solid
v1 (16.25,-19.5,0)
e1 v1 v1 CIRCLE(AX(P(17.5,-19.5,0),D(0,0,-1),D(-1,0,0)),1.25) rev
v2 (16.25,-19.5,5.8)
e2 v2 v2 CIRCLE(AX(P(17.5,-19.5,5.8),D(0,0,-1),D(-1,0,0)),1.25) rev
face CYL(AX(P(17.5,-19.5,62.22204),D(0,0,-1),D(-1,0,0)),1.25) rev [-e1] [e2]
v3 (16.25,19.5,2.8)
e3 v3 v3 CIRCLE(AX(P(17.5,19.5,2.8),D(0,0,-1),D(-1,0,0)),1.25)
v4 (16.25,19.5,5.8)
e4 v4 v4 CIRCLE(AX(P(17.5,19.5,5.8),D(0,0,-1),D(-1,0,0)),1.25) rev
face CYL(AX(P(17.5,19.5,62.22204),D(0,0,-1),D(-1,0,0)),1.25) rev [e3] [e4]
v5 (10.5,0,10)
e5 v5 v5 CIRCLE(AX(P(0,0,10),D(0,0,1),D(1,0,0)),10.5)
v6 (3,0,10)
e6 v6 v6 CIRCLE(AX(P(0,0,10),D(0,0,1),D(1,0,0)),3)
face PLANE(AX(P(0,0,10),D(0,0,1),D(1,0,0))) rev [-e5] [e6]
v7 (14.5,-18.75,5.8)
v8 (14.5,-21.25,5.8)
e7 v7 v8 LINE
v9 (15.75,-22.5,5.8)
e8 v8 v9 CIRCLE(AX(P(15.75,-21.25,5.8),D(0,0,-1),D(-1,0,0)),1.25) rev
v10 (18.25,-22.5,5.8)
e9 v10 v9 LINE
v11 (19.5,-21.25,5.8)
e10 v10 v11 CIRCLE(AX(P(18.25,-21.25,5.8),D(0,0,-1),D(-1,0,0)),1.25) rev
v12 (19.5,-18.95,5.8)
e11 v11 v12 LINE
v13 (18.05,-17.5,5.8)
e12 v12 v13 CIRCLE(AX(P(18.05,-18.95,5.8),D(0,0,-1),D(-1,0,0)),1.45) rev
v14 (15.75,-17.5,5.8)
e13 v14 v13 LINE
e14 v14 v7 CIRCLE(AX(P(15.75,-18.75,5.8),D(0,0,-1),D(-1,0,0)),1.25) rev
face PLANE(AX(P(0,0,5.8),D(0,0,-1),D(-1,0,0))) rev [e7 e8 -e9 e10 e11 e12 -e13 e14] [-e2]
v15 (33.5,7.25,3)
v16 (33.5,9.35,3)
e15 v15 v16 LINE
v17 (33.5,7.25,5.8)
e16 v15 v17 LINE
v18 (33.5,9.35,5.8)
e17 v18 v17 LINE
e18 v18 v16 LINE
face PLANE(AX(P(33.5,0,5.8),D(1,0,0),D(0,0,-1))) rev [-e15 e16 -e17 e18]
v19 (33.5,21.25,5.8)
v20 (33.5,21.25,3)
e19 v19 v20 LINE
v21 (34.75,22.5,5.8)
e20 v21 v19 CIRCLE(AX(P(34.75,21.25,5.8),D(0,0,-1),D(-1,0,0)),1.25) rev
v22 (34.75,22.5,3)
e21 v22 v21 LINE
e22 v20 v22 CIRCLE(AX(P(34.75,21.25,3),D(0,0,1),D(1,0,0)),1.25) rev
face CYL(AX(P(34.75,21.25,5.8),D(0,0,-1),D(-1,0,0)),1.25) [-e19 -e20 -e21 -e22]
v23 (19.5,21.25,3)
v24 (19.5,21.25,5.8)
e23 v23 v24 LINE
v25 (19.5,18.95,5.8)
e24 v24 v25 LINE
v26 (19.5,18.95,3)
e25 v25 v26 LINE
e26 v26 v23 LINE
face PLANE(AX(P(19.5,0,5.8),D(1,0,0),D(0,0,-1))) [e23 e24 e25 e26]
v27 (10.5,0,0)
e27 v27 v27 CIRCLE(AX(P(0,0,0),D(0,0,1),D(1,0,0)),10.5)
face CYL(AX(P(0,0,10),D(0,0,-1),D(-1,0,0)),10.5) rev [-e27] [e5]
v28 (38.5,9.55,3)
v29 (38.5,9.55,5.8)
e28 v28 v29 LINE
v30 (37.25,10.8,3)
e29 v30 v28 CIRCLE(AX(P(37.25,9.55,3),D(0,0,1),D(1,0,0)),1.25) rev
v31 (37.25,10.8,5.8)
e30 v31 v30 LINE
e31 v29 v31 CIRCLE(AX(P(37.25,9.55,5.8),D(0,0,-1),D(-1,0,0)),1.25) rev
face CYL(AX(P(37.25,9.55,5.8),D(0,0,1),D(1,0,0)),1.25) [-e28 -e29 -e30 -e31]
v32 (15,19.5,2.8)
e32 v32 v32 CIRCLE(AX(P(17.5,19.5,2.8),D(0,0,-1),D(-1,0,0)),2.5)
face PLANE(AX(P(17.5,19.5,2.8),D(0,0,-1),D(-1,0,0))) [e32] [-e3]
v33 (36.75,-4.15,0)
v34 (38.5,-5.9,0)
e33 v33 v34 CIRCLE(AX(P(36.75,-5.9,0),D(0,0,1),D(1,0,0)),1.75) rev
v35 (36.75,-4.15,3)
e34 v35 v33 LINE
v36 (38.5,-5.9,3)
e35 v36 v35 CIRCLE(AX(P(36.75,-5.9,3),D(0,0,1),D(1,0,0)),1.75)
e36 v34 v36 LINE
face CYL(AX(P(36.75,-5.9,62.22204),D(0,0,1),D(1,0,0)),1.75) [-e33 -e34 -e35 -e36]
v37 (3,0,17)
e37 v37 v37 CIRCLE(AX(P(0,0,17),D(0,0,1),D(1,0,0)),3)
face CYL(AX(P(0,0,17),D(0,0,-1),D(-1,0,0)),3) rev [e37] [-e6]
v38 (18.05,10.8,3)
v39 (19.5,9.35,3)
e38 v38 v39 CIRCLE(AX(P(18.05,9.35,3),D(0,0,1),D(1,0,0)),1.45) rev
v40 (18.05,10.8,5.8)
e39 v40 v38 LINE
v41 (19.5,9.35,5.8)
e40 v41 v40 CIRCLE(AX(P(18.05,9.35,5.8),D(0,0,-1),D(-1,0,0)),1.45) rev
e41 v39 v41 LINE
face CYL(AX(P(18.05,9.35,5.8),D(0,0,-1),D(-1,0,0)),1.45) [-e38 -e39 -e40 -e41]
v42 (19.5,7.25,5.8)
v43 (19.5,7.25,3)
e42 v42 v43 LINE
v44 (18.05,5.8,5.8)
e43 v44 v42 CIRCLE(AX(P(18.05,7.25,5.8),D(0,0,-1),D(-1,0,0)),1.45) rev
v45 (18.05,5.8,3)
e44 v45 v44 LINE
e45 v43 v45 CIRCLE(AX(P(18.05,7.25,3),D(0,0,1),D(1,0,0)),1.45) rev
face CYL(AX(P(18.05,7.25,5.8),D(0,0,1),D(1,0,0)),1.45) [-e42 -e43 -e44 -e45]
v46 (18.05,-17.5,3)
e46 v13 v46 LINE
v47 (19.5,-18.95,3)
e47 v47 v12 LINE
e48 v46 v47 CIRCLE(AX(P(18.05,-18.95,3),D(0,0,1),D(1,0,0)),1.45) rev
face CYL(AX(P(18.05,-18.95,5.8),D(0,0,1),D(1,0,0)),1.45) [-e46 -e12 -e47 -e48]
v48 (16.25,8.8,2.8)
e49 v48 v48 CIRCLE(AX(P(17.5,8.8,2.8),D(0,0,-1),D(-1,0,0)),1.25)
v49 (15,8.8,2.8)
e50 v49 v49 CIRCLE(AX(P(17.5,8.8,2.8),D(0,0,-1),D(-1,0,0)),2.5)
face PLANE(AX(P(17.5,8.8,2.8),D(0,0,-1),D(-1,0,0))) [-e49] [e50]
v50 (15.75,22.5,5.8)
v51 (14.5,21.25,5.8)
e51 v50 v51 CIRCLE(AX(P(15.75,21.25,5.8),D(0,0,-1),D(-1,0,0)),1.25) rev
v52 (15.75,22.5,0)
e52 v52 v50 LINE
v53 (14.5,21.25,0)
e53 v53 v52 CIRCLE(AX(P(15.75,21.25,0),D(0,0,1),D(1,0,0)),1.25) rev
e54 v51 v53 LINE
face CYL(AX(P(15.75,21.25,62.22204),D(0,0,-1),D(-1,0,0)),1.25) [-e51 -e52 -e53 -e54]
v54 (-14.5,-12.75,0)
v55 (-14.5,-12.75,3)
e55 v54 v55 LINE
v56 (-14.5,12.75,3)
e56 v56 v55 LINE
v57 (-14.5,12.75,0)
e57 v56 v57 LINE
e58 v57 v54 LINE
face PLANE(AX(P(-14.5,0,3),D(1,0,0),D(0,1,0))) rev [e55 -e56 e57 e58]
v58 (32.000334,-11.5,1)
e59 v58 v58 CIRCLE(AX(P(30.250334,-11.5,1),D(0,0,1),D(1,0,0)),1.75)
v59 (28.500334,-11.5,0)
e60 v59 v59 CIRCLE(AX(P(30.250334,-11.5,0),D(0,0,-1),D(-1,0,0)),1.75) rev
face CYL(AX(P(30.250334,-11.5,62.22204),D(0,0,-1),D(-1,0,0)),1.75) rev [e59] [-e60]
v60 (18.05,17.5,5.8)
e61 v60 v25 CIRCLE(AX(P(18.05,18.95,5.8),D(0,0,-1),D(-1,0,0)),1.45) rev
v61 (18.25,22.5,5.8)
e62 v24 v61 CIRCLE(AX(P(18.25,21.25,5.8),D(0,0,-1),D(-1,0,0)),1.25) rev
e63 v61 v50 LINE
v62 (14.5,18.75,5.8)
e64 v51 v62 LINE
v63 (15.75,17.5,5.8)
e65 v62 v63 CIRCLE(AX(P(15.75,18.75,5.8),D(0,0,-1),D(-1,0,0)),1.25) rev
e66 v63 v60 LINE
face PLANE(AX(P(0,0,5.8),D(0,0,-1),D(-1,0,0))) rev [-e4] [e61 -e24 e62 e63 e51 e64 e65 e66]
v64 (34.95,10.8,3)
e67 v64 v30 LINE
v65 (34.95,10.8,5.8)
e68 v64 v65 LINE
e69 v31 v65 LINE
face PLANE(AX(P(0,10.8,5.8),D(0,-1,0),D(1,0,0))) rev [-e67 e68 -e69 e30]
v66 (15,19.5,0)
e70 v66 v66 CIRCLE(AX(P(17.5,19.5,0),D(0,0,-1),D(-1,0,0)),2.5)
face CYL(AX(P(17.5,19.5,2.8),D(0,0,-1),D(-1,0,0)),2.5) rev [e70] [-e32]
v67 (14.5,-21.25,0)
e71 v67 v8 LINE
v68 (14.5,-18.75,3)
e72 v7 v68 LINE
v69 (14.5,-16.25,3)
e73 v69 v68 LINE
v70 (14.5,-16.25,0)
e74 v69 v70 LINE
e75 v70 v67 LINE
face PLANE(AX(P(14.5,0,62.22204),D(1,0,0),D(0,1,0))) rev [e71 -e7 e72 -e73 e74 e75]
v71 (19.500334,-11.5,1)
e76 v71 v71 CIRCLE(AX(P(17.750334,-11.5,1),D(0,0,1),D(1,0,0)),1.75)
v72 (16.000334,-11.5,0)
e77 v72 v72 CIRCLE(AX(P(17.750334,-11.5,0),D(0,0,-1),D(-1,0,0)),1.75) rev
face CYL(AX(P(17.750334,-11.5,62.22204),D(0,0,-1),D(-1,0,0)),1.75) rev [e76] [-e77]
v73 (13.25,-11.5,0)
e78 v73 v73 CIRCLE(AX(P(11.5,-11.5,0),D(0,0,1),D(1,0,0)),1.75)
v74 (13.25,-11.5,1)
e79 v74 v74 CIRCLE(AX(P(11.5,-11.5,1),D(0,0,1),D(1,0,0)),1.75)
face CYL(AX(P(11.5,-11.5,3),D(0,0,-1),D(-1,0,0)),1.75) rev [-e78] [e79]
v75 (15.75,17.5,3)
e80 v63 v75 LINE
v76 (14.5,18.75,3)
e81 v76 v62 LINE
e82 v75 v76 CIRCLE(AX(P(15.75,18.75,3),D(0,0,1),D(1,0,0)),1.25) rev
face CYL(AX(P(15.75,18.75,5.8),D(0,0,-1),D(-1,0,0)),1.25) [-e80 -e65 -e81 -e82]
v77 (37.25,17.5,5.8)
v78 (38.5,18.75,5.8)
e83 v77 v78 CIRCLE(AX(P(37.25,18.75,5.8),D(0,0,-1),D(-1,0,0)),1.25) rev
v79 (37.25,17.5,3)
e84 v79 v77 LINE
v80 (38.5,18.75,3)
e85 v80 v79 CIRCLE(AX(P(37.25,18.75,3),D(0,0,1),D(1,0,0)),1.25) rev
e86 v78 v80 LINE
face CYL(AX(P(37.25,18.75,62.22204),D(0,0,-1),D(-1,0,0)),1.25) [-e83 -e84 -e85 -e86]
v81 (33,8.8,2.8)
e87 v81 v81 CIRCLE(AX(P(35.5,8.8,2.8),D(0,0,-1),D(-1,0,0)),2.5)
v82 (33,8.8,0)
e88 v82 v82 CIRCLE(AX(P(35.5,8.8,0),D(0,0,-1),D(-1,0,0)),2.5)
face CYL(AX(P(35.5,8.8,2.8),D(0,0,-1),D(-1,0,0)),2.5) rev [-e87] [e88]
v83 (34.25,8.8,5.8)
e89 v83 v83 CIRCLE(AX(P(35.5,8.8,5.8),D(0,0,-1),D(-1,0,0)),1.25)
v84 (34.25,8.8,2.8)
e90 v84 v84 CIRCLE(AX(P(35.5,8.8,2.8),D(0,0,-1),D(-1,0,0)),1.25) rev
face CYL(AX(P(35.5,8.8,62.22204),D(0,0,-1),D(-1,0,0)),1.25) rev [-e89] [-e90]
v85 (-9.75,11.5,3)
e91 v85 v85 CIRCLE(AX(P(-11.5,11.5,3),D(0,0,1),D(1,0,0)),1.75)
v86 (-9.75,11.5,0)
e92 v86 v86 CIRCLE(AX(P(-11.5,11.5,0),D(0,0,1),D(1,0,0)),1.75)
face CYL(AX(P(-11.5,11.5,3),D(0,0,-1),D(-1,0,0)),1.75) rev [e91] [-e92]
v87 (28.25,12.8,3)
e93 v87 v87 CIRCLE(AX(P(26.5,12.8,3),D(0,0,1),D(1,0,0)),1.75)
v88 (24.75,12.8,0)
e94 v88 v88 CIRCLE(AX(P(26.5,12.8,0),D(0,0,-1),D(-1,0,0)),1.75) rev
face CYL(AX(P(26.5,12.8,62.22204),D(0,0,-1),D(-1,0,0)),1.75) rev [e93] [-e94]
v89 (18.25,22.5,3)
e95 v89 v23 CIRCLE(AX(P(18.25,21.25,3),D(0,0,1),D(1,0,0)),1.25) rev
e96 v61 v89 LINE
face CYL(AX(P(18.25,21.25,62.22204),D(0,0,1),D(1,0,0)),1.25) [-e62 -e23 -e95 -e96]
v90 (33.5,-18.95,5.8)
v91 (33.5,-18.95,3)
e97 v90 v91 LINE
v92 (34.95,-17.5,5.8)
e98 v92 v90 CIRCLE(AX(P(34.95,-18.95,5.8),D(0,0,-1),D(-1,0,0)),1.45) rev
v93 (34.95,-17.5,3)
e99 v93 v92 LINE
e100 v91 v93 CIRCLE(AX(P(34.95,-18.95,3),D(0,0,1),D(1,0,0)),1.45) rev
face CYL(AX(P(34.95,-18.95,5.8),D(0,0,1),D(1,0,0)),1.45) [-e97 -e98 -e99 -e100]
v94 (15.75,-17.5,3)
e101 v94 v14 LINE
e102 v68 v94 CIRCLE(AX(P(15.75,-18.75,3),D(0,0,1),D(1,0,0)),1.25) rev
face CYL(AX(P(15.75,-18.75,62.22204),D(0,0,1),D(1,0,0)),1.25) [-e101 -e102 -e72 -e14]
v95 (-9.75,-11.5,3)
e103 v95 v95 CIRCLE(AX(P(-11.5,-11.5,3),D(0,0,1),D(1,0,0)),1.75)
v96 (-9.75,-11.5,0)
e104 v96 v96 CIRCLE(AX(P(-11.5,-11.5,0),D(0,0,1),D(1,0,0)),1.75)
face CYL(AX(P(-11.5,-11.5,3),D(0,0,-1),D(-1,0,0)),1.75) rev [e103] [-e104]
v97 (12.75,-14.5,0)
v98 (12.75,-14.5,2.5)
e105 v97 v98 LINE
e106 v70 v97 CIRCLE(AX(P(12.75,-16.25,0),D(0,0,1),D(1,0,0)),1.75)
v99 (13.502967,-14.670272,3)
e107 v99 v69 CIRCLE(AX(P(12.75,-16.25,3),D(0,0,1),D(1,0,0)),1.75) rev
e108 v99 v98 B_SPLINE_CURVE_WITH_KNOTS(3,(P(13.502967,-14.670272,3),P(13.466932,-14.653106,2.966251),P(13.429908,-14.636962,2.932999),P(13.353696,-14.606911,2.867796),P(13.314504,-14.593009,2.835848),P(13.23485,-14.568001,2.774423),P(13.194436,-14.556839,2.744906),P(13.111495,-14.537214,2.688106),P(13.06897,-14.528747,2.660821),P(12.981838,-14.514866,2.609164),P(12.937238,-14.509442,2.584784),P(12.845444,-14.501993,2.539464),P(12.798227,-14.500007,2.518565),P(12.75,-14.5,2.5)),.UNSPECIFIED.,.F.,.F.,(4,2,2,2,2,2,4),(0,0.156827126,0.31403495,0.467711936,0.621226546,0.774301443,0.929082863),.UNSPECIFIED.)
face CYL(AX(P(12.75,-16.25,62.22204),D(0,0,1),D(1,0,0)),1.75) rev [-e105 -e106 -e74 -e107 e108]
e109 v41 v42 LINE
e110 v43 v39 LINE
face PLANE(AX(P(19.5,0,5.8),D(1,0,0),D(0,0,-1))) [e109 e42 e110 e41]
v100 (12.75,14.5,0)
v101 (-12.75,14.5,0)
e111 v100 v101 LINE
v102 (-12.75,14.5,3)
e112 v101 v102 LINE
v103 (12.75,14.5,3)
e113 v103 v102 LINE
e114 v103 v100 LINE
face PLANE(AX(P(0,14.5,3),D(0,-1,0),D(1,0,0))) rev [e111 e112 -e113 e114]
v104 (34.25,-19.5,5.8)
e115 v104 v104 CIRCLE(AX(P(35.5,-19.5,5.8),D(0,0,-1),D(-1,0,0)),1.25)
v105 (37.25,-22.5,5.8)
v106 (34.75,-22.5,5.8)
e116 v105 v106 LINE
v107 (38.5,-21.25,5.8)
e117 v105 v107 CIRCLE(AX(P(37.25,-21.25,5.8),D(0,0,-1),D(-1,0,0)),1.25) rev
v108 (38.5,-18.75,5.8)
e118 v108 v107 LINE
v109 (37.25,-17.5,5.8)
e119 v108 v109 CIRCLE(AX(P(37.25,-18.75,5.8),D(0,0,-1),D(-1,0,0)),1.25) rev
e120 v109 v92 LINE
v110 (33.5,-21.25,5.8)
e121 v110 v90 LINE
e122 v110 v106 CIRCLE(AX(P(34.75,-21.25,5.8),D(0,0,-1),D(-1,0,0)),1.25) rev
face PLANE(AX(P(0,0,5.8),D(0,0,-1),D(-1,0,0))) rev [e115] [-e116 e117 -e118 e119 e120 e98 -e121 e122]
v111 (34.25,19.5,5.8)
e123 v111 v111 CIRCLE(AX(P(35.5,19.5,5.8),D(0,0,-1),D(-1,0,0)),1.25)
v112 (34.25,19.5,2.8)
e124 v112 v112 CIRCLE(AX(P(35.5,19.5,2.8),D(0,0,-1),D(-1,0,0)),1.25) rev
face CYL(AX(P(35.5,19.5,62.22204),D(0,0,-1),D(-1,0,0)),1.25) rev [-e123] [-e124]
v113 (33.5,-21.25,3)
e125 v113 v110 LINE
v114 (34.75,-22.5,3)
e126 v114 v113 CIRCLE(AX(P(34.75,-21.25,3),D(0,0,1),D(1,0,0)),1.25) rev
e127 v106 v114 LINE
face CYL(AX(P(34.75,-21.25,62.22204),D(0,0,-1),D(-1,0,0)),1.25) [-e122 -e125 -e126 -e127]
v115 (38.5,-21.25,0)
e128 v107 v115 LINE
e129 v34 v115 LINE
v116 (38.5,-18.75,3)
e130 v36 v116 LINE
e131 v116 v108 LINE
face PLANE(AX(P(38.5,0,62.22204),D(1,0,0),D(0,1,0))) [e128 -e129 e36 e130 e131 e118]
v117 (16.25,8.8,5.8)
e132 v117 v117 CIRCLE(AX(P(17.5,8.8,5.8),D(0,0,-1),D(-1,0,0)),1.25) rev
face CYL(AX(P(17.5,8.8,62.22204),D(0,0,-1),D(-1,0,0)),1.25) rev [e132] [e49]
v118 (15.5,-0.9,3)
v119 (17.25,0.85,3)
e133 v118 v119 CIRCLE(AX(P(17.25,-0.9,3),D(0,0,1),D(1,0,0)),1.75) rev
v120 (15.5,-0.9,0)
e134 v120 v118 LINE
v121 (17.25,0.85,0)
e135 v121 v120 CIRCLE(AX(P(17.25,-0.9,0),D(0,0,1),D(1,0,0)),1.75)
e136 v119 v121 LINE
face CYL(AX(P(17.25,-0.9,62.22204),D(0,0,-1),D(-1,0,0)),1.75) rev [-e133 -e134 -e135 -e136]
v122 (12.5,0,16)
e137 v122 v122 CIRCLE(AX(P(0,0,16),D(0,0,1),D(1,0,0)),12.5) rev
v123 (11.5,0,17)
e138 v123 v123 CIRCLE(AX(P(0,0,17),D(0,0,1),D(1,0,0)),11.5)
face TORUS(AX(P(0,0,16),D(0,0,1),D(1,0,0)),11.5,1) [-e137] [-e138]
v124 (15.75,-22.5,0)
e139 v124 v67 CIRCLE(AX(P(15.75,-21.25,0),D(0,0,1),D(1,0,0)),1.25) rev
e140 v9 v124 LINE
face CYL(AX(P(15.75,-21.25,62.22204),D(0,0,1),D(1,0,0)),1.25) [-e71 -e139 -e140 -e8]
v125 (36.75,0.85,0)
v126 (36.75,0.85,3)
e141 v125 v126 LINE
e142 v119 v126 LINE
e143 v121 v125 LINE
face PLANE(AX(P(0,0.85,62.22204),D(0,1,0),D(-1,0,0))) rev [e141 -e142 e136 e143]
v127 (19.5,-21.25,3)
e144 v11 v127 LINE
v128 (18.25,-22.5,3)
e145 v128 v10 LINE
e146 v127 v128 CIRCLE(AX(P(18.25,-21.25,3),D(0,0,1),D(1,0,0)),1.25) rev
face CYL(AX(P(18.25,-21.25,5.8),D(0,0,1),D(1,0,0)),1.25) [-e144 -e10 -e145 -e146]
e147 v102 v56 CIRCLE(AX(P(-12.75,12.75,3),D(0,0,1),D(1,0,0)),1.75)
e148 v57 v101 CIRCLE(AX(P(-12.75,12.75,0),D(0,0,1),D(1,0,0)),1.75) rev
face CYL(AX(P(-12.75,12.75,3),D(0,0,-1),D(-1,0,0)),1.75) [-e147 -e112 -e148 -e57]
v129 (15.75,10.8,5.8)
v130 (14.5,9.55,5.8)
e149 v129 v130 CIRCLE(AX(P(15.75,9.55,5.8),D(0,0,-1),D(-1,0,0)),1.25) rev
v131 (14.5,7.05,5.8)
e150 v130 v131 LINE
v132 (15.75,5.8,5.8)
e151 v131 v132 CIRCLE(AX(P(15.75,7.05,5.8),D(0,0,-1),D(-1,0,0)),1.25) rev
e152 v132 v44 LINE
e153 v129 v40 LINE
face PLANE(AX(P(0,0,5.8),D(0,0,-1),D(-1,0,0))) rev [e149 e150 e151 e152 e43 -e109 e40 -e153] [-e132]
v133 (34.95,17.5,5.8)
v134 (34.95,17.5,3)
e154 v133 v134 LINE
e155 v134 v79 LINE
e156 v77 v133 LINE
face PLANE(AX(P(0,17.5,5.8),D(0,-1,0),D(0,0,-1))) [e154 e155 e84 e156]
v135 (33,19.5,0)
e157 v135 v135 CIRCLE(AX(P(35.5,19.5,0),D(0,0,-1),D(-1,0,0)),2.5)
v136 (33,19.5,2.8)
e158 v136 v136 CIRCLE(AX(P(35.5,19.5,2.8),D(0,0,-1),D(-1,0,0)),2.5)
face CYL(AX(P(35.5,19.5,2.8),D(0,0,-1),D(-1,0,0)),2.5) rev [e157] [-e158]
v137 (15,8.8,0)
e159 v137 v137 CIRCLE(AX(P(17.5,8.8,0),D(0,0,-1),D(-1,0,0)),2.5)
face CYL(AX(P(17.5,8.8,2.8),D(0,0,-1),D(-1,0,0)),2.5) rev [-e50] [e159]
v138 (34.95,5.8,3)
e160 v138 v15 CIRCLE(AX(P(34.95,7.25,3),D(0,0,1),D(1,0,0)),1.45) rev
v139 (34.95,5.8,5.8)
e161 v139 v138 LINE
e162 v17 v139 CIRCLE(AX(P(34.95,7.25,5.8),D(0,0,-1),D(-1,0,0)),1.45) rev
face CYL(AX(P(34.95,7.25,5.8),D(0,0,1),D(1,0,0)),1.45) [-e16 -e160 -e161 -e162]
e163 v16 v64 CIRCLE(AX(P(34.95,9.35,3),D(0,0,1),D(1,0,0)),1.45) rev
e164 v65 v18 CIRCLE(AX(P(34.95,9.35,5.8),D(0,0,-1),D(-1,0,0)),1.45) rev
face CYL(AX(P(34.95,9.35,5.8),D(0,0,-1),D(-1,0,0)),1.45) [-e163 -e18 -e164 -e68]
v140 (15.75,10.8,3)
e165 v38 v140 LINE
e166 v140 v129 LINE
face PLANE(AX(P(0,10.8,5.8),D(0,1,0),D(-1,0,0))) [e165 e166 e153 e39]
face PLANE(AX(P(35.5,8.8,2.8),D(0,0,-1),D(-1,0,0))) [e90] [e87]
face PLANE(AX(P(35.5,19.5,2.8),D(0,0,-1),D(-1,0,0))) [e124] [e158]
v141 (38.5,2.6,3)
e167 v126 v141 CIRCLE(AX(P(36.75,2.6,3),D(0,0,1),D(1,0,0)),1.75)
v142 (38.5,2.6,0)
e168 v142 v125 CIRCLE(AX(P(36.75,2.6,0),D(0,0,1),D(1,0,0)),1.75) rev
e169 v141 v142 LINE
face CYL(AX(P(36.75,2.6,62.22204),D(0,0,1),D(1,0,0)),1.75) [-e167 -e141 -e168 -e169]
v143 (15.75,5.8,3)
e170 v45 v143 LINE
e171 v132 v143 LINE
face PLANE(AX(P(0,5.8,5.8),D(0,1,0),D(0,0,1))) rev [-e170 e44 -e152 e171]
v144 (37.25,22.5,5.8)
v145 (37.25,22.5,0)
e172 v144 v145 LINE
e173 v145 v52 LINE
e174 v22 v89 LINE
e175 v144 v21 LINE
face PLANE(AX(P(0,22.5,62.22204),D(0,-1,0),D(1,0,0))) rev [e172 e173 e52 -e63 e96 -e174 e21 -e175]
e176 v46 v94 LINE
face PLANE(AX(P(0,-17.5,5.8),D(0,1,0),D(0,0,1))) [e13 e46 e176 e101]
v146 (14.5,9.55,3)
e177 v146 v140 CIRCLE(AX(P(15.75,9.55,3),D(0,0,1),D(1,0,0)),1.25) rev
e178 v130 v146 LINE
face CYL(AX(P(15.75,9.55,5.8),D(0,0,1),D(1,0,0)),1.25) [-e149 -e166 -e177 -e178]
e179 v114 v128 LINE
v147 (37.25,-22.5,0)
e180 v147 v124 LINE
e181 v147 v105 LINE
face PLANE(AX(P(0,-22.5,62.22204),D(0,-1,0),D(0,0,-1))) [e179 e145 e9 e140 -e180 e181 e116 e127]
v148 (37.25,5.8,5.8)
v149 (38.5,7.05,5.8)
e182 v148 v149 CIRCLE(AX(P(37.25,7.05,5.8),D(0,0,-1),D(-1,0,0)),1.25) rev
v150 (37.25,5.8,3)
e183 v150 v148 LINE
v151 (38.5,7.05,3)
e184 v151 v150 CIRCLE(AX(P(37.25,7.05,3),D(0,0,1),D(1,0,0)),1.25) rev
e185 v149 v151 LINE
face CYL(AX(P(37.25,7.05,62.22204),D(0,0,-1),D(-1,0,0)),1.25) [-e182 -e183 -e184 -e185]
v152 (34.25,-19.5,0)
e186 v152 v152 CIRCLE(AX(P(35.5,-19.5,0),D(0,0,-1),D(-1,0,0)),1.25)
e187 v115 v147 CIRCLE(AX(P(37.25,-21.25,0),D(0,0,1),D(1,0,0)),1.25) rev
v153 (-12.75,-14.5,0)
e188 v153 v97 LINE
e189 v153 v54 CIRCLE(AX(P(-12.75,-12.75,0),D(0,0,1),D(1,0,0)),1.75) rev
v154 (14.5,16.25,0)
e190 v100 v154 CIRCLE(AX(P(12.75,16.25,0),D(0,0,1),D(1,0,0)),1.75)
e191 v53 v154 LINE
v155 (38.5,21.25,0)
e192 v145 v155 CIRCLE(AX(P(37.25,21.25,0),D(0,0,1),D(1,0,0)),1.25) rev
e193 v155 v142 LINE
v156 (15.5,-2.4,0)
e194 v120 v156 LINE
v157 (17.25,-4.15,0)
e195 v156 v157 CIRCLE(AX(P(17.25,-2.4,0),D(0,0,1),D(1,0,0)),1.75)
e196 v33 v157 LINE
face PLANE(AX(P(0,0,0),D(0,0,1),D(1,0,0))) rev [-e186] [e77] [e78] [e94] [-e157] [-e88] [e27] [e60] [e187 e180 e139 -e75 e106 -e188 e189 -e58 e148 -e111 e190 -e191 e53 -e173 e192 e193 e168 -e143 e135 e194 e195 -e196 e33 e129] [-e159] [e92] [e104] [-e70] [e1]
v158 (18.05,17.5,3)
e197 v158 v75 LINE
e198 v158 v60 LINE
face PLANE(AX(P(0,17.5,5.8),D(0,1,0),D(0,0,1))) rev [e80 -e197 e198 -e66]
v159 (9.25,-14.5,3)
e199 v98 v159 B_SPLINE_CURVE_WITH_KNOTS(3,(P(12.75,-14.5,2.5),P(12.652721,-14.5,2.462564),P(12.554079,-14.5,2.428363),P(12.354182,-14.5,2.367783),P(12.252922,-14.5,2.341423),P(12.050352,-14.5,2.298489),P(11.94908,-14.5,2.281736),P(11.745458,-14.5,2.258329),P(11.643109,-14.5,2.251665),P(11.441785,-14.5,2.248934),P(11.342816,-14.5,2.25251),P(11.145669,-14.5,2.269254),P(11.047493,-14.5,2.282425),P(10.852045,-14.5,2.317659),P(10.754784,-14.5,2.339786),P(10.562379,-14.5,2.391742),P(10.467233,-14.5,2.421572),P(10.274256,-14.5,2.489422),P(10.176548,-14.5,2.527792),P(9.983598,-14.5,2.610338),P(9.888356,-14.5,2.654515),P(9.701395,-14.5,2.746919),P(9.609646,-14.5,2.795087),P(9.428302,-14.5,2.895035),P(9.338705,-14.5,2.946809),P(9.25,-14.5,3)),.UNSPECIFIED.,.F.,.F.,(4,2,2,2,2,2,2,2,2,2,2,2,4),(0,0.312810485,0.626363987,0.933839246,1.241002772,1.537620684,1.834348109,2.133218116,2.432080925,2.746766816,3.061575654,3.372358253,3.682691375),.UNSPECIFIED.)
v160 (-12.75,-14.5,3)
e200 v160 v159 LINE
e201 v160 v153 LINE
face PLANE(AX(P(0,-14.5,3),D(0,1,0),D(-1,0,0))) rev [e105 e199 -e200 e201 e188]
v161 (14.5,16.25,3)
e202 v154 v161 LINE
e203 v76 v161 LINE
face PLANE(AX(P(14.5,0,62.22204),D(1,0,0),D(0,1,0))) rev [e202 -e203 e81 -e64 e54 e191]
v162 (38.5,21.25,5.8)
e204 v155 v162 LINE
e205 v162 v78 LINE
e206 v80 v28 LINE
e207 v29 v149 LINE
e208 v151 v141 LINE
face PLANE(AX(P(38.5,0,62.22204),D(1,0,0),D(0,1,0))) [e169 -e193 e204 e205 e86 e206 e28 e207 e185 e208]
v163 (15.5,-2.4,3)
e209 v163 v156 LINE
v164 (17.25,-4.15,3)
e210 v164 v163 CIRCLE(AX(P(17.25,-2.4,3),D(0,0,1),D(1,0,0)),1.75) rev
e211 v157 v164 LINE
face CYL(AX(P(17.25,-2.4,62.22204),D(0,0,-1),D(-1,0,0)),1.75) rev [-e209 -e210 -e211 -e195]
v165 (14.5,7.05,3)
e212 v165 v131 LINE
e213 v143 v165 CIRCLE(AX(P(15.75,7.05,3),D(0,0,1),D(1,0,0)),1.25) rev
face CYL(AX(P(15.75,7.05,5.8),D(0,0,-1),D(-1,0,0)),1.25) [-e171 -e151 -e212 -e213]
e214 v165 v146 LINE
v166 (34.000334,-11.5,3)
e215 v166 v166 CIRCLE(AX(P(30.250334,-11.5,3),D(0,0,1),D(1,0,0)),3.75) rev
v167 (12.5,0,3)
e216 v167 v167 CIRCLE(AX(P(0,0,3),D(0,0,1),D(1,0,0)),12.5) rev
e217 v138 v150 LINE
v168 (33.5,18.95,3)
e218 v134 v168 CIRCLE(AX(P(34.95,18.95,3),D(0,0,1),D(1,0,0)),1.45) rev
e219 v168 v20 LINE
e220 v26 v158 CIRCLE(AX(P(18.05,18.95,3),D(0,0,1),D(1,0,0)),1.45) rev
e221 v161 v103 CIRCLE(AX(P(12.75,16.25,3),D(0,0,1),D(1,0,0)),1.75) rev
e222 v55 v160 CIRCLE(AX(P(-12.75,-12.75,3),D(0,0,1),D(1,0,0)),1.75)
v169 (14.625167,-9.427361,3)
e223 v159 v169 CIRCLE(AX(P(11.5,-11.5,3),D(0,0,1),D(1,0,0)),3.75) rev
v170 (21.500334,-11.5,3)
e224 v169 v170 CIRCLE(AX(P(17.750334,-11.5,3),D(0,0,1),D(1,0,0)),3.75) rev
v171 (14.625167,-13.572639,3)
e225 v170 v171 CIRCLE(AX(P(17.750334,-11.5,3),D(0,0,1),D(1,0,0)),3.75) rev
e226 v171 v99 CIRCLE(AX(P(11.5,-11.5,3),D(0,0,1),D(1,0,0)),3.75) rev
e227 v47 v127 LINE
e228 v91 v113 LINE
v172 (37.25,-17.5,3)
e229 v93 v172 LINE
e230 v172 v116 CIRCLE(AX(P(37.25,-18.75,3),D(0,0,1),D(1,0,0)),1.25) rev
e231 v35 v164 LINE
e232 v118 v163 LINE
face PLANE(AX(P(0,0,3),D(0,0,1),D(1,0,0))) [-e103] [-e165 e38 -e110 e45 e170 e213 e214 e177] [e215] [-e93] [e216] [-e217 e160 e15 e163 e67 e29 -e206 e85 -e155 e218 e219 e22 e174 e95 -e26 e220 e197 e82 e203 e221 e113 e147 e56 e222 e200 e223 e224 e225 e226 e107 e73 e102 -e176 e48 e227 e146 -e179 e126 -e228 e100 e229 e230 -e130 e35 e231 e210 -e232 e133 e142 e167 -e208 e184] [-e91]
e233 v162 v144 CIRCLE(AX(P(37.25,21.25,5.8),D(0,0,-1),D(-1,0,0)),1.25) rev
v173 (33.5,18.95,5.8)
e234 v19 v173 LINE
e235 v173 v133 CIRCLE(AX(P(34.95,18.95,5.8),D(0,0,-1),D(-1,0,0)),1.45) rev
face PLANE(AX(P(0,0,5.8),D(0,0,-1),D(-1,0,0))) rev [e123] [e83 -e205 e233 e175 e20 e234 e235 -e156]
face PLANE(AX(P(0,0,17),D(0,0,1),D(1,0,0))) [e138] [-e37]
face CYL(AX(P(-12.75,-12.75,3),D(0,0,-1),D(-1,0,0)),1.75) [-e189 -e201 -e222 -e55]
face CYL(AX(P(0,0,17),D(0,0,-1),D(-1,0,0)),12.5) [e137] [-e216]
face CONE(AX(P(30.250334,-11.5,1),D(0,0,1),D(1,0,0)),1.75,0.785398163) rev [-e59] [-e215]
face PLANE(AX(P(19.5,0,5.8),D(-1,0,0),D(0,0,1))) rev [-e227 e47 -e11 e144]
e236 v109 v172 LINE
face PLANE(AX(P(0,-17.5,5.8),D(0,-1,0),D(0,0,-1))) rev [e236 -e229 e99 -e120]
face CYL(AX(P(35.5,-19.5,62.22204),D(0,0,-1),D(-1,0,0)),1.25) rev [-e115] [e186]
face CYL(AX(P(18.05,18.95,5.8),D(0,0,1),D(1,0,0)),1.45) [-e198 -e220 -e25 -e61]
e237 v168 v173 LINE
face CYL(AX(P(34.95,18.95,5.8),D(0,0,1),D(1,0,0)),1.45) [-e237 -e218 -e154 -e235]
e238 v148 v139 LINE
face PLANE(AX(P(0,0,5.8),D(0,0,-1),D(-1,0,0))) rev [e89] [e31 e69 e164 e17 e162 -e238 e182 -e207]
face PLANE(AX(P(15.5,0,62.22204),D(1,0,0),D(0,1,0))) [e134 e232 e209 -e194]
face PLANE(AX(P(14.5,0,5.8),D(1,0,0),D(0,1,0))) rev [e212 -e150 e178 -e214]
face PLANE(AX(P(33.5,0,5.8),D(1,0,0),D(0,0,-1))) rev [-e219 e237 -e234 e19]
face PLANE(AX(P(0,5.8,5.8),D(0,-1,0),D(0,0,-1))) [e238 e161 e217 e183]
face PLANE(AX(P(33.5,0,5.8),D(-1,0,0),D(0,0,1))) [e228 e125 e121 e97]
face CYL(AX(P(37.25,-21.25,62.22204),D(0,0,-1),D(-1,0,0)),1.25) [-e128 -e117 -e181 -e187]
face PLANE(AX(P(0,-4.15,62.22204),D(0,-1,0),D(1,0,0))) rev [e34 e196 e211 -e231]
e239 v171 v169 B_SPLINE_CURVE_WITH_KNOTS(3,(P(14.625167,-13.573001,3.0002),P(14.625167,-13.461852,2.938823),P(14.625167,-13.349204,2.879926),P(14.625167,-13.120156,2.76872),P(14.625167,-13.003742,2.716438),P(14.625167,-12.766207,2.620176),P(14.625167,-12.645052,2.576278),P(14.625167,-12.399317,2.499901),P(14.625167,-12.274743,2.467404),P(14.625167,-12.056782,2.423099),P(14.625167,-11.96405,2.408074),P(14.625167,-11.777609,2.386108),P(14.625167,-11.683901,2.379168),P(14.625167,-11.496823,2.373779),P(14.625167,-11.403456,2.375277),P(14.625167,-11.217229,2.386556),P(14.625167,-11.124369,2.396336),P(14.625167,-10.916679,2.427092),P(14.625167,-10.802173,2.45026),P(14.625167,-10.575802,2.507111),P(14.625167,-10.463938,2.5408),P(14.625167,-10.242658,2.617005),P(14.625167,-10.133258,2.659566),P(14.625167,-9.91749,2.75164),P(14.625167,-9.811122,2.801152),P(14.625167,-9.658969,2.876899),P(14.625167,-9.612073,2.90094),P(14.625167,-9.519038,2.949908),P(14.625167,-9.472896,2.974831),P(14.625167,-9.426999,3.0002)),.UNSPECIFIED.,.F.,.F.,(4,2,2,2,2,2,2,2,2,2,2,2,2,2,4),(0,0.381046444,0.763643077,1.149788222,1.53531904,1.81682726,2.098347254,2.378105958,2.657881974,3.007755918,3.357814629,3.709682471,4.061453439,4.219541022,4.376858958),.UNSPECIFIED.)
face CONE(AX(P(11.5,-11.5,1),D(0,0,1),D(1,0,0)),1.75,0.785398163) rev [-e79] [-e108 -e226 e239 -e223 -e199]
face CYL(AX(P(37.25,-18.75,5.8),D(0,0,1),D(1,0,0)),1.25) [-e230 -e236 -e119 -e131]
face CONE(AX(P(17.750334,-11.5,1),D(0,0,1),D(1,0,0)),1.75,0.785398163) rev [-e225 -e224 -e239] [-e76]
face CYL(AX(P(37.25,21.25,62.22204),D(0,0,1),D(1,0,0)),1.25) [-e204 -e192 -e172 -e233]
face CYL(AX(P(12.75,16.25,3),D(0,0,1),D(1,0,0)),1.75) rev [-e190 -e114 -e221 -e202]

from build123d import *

# Parameters (mm, degrees)
ESQUISSE1_R             = 10.5
ESQUISSE1_R_2           = 1.75
BOSS_EXTRU_1_DEPTH      = 3
ESQUISSE1_3_R           = 12.5
ESQUISSE1_3_R_2         = 3
BOSS_EXTRU_2_DEPTH      = 17
ESQUISSE1_5_R           = 10.5
ENL_V_MAT_EXTRU_1_DEPTH = 10
ESQUISSE4_R             = 1.25
ESQUISSE4_R_2           = 1.75
BOSS_EXTRU_4_DEPTH      = 3
ESQUISSE4_3_W           = 5
ESQUISSE4_3_H           = 5
ESQUISSE4_3_R           = 1.25
BOSS_EXTRU_5_DEPTH      = 5.8
CONG_4_R                = 1.75
CONG_5_R                = 1.25
CONG_6_R                = 1.45
CHANFREIN2_SIZE         = 2
ESQUISSE5_R             = 2.5
ENL_V_MAT_EXTRU_5_DEPTH = 2.8
CONG_7_R                = 1


with BuildPart() as part:
    # Esquisse1 → Boss.-Extru.1 (new body)
    with BuildSketch(Plane.XY):
        with BuildLine():
            Line((0, 14.5), (-14.5, 14.5))
            Line((-14.5, 14.5), (-14.5, -14.5))
            Line((-14.5, -14.5), (14.5, -14.5))
            Line((14.5, -14.5), (14.5, 0))
            ThreePointArc((14.5, 0), (10.253048327, 10.253048327), (0, 14.5))
        make_face()
        Circle(ESQUISSE1_R, mode=Mode.SUBTRACT)
        with Locations((-11.5, 11.5)):
            Circle(ESQUISSE1_R_2, mode=Mode.SUBTRACT)
        with Locations((11.5, -11.5)):
            Circle(ESQUISSE1_R_2, mode=Mode.SUBTRACT)
        with Locations((-11.5, -11.5)):
            Circle(ESQUISSE1_R_2, mode=Mode.SUBTRACT)
    extrude(amount=BOSS_EXTRU_1_DEPTH)

    # Esquisse1<3> → Boss.-Extru.2 (add)
    with BuildSketch(Plane.XY):
        Circle(ESQUISSE1_3_R)
        Circle(ESQUISSE1_3_R_2, mode=Mode.SUBTRACT)
    extrude(amount=BOSS_EXTRU_2_DEPTH)

    # Esquisse1<5> → Enlèv. mat.-Extru.1 (cut)
    with BuildSketch(Plane.XY):
        Circle(ESQUISSE1_5_R)
    extrude(amount=ENL_V_MAT_EXTRU_1_DEPTH, mode=Mode.SUBTRACT)

    # Esquisse4 → Boss.-Extru.4 (add)
    with BuildSketch(Plane(origin=(0, 0, 0), x_dir=(-1, 0, 0), z_dir=(0, 0, -1))):
        with BuildLine():
            Line((-14.5, 22.5), (-38.5, 22.5))
            Line((-38.5, 22.5), (-38.5, 0.85))
            Line((-38.5, 0.85), (-15.5, 0.85))
            Line((-15.5, 0.85), (-15.5, -4.15))
            Line((-15.5, -4.15), (-38.5, -4.15))
            Line((-38.5, -4.15), (-38.5, -22.5))
            Line((-38.5, -22.5), (-14.5, -22.5))
            Line((-14.5, -22.5), (-14.5, 0))
            ThreePointArc((-14.5, 0), (-10.253048327, 10.253048327), (0, 14.5))
            Line((0, 14.5), (-14.5, 14.5))
            Line((-14.5, 14.5), (-14.5, 22.5))
        make_face()
        with Locations((-17.5, 19.5)):
            Circle(ESQUISSE4_R, mode=Mode.SUBTRACT)
        with Locations((-17.750334005, -11.5)):
            Circle(ESQUISSE4_R_2, mode=Mode.SUBTRACT)
        with Locations((-26.5, 12.8)):
            Circle(ESQUISSE4_R_2, mode=Mode.SUBTRACT)
        with Locations((-30.250334005, -11.5)):
            Circle(ESQUISSE4_R_2, mode=Mode.SUBTRACT)
        with Locations((-35.5, 19.5)):
            Circle(ESQUISSE4_R, mode=Mode.SUBTRACT)
        with Locations((-17.5, 8.8)):
            Circle(ESQUISSE4_R, mode=Mode.SUBTRACT)
        with Locations((-17.5, -19.5)):
            Circle(ESQUISSE4_R, mode=Mode.SUBTRACT)
        with Locations((-35.5, 8.8)):
            Circle(ESQUISSE4_R, mode=Mode.SUBTRACT)
        with Locations((-35.5, -19.5)):
            Circle(ESQUISSE4_R, mode=Mode.SUBTRACT)
    extrude(amount=-BOSS_EXTRU_4_DEPTH)

    # Esquisse4<3> → Boss.-Extru.5 (add)
    # profile 1 of 6: a face of its own
    with BuildSketch(Plane(origin=(0, 0, 0), x_dir=(-1, 0, 0), z_dir=(0, 0, -1))):
        with Locations((-17, -20)):
            Rectangle(ESQUISSE4_3_W, ESQUISSE4_3_H)
        with Locations((-17.5, -19.5)):
            Circle(ESQUISSE4_3_R, mode=Mode.SUBTRACT)
    # profile 2 of 6: a face of its own
    with BuildSketch(Plane(origin=(0, 0, 0), x_dir=(-1, 0, 0), z_dir=(0, 0, -1))):
        with Locations((-36, -20)):
            Rectangle(ESQUISSE4_3_W, ESQUISSE4_3_H)
        with Locations((-35.5, -19.5)):
            Circle(ESQUISSE4_3_R, mode=Mode.SUBTRACT)
    # profile 3 of 6: a face of its own
    with BuildSketch(Plane(origin=(0, 0, 0), x_dir=(-1, 0, 0), z_dir=(0, 0, -1))):
        with Locations((-36, 8.3)):
            Rectangle(ESQUISSE4_3_W, ESQUISSE4_3_H)
        with Locations((-35.5, 8.8)):
            Circle(ESQUISSE4_3_R, mode=Mode.SUBTRACT)
    # profile 4 of 6: a face of its own
    with BuildSketch(Plane(origin=(0, 0, 0), x_dir=(-1, 0, 0), z_dir=(0, 0, -1))):
        with Locations((-36, 20)):
            Rectangle(ESQUISSE4_3_W, ESQUISSE4_3_H)
        with Locations((-35.5, 19.5)):
            Circle(ESQUISSE4_3_R, mode=Mode.SUBTRACT)
    # profile 5 of 6: a face of its own
    with BuildSketch(Plane(origin=(0, 0, 0), x_dir=(-1, 0, 0), z_dir=(0, 0, -1))):
        with Locations((-17, 20)):
            Rectangle(ESQUISSE4_3_W, ESQUISSE4_3_H)
        with Locations((-17.5, 19.5)):
            Circle(ESQUISSE4_3_R, mode=Mode.SUBTRACT)
    # profile 6 of 6: a face of its own
    with BuildSketch(Plane(origin=(0, 0, 0), x_dir=(-1, 0, 0), z_dir=(0, 0, -1))):
        with Locations((-17, 8.3)):
            Rectangle(ESQUISSE4_3_W, ESQUISSE4_3_H)
        with Locations((-17.5, 8.8)):
            Circle(ESQUISSE4_3_R, mode=Mode.SUBTRACT)
    extrude(amount=-BOSS_EXTRU_5_DEPTH)

    # Congé4
    cong_4_edges = [part.edges().sort_by_distance(p)[0] for p in [
        (14.5, -14.5, 1.5),
        (-14.5, -14.5, 1.5),
        (-14.5, 14.5, 1.5),
        (38.5, -4.15, 1.5),
        (15.5, -4.15, 1.5),
        (15.5, 0.85, 1.5),
        (38.5, 0.85, 1.5),
        (14.5, 14.5, 1.5),
    ]]
    fillet(cong_4_edges, radius=CONG_4_R)

    # Congé5
    cong_5_edges = [part.edges().sort_by_distance(p)[0] for p in [
        (19.5, -22.5, 4.4),
        (14.5, -17.5, 4.4),
        (38.5, -17.5, 4.4),
        (33.5, -22.5, 4.4),
        (38.5, 10.8, 4.4),
        (38.5, 5.8, 4.4),
        (33.5, 22.5, 4.4),
        (38.5, 17.5, 4.4),
        (19.5, 22.5, 4.4),
        (14.5, 17.5, 4.4),
        (14.5, 10.8, 4.4),
        (14.5, 5.8, 4.4),
        (14.5, -22.5, 2.9),
        (38.5, -22.5, 2.9),
        (38.5, 22.5, 2.9),
        (14.5, 22.5, 2.9),
    ]]
    fillet(cong_5_edges, radius=CONG_5_R)

    # Congé6
    cong_6_edges = [part.edges().sort_by_distance(p)[0] for p in [
        (19.5, -17.5, 4.4),
        (33.5, -17.5, 4.4),
        (33.5, 10.8, 4.4),
        (33.5, 5.8, 4.4),
        (33.5, 17.5, 4.4),
        (19.5, 17.5, 4.4),
        (19.5, 5.8, 4.4),
        (19.5, 10.8, 4.4),
    ]]
    fillet(cong_6_edges, radius=CONG_6_R)

    # Chanfrein2
    # the kernel refuses this chamfer: 2 mm, written as the material it takes off along each edge
    with BuildSketch(Plane(origin=(11.5, -11.5, 3), x_dir=(1, 0, 0), z_dir=(0, -1, 0))) as chanfrein2_piece_1:
        Polygon((1.75 + CHANFREIN2_SIZE, 0), (1.75, -CHANFREIN2_SIZE), (1.75, 0), align=None)
    revolve(axis=Axis((11.5, -11.5, 3), (0, 0, 1)), mode=Mode.SUBTRACT)
    with BuildSketch(Plane(origin=(17.750334005, -11.5, 3), x_dir=(-1, 0, 0), z_dir=(0, -1, 0))) as chanfrein2_piece_2:
        Polygon((1.75 + CHANFREIN2_SIZE, 0), (1.75, CHANFREIN2_SIZE), (1.75, 0), align=None)
    revolve(axis=Axis((17.750334005, -11.5, 3), (0, 0, -1)), mode=Mode.SUBTRACT)
    with BuildSketch(Plane(origin=(30.250334005, -11.5, 3), x_dir=(-1, 0, 0), z_dir=(0, -1, 0))) as chanfrein2_piece_3:
        Polygon((1.75 + CHANFREIN2_SIZE, 0), (1.75, CHANFREIN2_SIZE), (1.75, 0), align=None)
    revolve(axis=Axis((30.250334005, -11.5, 3), (0, 0, -1)), mode=Mode.SUBTRACT)

    # Esquisse5 → Enlèv. mat.-Extru.5 (cut)
    with BuildSketch(Plane(origin=(0, 0, 0), x_dir=(-1, 0, 0), z_dir=(0, 0, -1))):
        with Locations((-35.5, 19.5)):
            Circle(ESQUISSE5_R)
        with Locations((-17.5, 19.5)):
            Circle(ESQUISSE5_R)
        with Locations((-35.5, 8.8)):
            Circle(ESQUISSE5_R)
        with Locations((-17.5, 8.8)):
            Circle(ESQUISSE5_R)
    extrude(amount=-ENL_V_MAT_EXTRU_5_DEPTH, mode=Mode.SUBTRACT)

    # Congé7
    cong_7_edges = [part.edges().sort_by_distance(p)[0] for p in [
        (-12.5, 0, 17),
    ]]
    fillet(cong_7_edges, radius=CONG_7_R)


solid = part.part
